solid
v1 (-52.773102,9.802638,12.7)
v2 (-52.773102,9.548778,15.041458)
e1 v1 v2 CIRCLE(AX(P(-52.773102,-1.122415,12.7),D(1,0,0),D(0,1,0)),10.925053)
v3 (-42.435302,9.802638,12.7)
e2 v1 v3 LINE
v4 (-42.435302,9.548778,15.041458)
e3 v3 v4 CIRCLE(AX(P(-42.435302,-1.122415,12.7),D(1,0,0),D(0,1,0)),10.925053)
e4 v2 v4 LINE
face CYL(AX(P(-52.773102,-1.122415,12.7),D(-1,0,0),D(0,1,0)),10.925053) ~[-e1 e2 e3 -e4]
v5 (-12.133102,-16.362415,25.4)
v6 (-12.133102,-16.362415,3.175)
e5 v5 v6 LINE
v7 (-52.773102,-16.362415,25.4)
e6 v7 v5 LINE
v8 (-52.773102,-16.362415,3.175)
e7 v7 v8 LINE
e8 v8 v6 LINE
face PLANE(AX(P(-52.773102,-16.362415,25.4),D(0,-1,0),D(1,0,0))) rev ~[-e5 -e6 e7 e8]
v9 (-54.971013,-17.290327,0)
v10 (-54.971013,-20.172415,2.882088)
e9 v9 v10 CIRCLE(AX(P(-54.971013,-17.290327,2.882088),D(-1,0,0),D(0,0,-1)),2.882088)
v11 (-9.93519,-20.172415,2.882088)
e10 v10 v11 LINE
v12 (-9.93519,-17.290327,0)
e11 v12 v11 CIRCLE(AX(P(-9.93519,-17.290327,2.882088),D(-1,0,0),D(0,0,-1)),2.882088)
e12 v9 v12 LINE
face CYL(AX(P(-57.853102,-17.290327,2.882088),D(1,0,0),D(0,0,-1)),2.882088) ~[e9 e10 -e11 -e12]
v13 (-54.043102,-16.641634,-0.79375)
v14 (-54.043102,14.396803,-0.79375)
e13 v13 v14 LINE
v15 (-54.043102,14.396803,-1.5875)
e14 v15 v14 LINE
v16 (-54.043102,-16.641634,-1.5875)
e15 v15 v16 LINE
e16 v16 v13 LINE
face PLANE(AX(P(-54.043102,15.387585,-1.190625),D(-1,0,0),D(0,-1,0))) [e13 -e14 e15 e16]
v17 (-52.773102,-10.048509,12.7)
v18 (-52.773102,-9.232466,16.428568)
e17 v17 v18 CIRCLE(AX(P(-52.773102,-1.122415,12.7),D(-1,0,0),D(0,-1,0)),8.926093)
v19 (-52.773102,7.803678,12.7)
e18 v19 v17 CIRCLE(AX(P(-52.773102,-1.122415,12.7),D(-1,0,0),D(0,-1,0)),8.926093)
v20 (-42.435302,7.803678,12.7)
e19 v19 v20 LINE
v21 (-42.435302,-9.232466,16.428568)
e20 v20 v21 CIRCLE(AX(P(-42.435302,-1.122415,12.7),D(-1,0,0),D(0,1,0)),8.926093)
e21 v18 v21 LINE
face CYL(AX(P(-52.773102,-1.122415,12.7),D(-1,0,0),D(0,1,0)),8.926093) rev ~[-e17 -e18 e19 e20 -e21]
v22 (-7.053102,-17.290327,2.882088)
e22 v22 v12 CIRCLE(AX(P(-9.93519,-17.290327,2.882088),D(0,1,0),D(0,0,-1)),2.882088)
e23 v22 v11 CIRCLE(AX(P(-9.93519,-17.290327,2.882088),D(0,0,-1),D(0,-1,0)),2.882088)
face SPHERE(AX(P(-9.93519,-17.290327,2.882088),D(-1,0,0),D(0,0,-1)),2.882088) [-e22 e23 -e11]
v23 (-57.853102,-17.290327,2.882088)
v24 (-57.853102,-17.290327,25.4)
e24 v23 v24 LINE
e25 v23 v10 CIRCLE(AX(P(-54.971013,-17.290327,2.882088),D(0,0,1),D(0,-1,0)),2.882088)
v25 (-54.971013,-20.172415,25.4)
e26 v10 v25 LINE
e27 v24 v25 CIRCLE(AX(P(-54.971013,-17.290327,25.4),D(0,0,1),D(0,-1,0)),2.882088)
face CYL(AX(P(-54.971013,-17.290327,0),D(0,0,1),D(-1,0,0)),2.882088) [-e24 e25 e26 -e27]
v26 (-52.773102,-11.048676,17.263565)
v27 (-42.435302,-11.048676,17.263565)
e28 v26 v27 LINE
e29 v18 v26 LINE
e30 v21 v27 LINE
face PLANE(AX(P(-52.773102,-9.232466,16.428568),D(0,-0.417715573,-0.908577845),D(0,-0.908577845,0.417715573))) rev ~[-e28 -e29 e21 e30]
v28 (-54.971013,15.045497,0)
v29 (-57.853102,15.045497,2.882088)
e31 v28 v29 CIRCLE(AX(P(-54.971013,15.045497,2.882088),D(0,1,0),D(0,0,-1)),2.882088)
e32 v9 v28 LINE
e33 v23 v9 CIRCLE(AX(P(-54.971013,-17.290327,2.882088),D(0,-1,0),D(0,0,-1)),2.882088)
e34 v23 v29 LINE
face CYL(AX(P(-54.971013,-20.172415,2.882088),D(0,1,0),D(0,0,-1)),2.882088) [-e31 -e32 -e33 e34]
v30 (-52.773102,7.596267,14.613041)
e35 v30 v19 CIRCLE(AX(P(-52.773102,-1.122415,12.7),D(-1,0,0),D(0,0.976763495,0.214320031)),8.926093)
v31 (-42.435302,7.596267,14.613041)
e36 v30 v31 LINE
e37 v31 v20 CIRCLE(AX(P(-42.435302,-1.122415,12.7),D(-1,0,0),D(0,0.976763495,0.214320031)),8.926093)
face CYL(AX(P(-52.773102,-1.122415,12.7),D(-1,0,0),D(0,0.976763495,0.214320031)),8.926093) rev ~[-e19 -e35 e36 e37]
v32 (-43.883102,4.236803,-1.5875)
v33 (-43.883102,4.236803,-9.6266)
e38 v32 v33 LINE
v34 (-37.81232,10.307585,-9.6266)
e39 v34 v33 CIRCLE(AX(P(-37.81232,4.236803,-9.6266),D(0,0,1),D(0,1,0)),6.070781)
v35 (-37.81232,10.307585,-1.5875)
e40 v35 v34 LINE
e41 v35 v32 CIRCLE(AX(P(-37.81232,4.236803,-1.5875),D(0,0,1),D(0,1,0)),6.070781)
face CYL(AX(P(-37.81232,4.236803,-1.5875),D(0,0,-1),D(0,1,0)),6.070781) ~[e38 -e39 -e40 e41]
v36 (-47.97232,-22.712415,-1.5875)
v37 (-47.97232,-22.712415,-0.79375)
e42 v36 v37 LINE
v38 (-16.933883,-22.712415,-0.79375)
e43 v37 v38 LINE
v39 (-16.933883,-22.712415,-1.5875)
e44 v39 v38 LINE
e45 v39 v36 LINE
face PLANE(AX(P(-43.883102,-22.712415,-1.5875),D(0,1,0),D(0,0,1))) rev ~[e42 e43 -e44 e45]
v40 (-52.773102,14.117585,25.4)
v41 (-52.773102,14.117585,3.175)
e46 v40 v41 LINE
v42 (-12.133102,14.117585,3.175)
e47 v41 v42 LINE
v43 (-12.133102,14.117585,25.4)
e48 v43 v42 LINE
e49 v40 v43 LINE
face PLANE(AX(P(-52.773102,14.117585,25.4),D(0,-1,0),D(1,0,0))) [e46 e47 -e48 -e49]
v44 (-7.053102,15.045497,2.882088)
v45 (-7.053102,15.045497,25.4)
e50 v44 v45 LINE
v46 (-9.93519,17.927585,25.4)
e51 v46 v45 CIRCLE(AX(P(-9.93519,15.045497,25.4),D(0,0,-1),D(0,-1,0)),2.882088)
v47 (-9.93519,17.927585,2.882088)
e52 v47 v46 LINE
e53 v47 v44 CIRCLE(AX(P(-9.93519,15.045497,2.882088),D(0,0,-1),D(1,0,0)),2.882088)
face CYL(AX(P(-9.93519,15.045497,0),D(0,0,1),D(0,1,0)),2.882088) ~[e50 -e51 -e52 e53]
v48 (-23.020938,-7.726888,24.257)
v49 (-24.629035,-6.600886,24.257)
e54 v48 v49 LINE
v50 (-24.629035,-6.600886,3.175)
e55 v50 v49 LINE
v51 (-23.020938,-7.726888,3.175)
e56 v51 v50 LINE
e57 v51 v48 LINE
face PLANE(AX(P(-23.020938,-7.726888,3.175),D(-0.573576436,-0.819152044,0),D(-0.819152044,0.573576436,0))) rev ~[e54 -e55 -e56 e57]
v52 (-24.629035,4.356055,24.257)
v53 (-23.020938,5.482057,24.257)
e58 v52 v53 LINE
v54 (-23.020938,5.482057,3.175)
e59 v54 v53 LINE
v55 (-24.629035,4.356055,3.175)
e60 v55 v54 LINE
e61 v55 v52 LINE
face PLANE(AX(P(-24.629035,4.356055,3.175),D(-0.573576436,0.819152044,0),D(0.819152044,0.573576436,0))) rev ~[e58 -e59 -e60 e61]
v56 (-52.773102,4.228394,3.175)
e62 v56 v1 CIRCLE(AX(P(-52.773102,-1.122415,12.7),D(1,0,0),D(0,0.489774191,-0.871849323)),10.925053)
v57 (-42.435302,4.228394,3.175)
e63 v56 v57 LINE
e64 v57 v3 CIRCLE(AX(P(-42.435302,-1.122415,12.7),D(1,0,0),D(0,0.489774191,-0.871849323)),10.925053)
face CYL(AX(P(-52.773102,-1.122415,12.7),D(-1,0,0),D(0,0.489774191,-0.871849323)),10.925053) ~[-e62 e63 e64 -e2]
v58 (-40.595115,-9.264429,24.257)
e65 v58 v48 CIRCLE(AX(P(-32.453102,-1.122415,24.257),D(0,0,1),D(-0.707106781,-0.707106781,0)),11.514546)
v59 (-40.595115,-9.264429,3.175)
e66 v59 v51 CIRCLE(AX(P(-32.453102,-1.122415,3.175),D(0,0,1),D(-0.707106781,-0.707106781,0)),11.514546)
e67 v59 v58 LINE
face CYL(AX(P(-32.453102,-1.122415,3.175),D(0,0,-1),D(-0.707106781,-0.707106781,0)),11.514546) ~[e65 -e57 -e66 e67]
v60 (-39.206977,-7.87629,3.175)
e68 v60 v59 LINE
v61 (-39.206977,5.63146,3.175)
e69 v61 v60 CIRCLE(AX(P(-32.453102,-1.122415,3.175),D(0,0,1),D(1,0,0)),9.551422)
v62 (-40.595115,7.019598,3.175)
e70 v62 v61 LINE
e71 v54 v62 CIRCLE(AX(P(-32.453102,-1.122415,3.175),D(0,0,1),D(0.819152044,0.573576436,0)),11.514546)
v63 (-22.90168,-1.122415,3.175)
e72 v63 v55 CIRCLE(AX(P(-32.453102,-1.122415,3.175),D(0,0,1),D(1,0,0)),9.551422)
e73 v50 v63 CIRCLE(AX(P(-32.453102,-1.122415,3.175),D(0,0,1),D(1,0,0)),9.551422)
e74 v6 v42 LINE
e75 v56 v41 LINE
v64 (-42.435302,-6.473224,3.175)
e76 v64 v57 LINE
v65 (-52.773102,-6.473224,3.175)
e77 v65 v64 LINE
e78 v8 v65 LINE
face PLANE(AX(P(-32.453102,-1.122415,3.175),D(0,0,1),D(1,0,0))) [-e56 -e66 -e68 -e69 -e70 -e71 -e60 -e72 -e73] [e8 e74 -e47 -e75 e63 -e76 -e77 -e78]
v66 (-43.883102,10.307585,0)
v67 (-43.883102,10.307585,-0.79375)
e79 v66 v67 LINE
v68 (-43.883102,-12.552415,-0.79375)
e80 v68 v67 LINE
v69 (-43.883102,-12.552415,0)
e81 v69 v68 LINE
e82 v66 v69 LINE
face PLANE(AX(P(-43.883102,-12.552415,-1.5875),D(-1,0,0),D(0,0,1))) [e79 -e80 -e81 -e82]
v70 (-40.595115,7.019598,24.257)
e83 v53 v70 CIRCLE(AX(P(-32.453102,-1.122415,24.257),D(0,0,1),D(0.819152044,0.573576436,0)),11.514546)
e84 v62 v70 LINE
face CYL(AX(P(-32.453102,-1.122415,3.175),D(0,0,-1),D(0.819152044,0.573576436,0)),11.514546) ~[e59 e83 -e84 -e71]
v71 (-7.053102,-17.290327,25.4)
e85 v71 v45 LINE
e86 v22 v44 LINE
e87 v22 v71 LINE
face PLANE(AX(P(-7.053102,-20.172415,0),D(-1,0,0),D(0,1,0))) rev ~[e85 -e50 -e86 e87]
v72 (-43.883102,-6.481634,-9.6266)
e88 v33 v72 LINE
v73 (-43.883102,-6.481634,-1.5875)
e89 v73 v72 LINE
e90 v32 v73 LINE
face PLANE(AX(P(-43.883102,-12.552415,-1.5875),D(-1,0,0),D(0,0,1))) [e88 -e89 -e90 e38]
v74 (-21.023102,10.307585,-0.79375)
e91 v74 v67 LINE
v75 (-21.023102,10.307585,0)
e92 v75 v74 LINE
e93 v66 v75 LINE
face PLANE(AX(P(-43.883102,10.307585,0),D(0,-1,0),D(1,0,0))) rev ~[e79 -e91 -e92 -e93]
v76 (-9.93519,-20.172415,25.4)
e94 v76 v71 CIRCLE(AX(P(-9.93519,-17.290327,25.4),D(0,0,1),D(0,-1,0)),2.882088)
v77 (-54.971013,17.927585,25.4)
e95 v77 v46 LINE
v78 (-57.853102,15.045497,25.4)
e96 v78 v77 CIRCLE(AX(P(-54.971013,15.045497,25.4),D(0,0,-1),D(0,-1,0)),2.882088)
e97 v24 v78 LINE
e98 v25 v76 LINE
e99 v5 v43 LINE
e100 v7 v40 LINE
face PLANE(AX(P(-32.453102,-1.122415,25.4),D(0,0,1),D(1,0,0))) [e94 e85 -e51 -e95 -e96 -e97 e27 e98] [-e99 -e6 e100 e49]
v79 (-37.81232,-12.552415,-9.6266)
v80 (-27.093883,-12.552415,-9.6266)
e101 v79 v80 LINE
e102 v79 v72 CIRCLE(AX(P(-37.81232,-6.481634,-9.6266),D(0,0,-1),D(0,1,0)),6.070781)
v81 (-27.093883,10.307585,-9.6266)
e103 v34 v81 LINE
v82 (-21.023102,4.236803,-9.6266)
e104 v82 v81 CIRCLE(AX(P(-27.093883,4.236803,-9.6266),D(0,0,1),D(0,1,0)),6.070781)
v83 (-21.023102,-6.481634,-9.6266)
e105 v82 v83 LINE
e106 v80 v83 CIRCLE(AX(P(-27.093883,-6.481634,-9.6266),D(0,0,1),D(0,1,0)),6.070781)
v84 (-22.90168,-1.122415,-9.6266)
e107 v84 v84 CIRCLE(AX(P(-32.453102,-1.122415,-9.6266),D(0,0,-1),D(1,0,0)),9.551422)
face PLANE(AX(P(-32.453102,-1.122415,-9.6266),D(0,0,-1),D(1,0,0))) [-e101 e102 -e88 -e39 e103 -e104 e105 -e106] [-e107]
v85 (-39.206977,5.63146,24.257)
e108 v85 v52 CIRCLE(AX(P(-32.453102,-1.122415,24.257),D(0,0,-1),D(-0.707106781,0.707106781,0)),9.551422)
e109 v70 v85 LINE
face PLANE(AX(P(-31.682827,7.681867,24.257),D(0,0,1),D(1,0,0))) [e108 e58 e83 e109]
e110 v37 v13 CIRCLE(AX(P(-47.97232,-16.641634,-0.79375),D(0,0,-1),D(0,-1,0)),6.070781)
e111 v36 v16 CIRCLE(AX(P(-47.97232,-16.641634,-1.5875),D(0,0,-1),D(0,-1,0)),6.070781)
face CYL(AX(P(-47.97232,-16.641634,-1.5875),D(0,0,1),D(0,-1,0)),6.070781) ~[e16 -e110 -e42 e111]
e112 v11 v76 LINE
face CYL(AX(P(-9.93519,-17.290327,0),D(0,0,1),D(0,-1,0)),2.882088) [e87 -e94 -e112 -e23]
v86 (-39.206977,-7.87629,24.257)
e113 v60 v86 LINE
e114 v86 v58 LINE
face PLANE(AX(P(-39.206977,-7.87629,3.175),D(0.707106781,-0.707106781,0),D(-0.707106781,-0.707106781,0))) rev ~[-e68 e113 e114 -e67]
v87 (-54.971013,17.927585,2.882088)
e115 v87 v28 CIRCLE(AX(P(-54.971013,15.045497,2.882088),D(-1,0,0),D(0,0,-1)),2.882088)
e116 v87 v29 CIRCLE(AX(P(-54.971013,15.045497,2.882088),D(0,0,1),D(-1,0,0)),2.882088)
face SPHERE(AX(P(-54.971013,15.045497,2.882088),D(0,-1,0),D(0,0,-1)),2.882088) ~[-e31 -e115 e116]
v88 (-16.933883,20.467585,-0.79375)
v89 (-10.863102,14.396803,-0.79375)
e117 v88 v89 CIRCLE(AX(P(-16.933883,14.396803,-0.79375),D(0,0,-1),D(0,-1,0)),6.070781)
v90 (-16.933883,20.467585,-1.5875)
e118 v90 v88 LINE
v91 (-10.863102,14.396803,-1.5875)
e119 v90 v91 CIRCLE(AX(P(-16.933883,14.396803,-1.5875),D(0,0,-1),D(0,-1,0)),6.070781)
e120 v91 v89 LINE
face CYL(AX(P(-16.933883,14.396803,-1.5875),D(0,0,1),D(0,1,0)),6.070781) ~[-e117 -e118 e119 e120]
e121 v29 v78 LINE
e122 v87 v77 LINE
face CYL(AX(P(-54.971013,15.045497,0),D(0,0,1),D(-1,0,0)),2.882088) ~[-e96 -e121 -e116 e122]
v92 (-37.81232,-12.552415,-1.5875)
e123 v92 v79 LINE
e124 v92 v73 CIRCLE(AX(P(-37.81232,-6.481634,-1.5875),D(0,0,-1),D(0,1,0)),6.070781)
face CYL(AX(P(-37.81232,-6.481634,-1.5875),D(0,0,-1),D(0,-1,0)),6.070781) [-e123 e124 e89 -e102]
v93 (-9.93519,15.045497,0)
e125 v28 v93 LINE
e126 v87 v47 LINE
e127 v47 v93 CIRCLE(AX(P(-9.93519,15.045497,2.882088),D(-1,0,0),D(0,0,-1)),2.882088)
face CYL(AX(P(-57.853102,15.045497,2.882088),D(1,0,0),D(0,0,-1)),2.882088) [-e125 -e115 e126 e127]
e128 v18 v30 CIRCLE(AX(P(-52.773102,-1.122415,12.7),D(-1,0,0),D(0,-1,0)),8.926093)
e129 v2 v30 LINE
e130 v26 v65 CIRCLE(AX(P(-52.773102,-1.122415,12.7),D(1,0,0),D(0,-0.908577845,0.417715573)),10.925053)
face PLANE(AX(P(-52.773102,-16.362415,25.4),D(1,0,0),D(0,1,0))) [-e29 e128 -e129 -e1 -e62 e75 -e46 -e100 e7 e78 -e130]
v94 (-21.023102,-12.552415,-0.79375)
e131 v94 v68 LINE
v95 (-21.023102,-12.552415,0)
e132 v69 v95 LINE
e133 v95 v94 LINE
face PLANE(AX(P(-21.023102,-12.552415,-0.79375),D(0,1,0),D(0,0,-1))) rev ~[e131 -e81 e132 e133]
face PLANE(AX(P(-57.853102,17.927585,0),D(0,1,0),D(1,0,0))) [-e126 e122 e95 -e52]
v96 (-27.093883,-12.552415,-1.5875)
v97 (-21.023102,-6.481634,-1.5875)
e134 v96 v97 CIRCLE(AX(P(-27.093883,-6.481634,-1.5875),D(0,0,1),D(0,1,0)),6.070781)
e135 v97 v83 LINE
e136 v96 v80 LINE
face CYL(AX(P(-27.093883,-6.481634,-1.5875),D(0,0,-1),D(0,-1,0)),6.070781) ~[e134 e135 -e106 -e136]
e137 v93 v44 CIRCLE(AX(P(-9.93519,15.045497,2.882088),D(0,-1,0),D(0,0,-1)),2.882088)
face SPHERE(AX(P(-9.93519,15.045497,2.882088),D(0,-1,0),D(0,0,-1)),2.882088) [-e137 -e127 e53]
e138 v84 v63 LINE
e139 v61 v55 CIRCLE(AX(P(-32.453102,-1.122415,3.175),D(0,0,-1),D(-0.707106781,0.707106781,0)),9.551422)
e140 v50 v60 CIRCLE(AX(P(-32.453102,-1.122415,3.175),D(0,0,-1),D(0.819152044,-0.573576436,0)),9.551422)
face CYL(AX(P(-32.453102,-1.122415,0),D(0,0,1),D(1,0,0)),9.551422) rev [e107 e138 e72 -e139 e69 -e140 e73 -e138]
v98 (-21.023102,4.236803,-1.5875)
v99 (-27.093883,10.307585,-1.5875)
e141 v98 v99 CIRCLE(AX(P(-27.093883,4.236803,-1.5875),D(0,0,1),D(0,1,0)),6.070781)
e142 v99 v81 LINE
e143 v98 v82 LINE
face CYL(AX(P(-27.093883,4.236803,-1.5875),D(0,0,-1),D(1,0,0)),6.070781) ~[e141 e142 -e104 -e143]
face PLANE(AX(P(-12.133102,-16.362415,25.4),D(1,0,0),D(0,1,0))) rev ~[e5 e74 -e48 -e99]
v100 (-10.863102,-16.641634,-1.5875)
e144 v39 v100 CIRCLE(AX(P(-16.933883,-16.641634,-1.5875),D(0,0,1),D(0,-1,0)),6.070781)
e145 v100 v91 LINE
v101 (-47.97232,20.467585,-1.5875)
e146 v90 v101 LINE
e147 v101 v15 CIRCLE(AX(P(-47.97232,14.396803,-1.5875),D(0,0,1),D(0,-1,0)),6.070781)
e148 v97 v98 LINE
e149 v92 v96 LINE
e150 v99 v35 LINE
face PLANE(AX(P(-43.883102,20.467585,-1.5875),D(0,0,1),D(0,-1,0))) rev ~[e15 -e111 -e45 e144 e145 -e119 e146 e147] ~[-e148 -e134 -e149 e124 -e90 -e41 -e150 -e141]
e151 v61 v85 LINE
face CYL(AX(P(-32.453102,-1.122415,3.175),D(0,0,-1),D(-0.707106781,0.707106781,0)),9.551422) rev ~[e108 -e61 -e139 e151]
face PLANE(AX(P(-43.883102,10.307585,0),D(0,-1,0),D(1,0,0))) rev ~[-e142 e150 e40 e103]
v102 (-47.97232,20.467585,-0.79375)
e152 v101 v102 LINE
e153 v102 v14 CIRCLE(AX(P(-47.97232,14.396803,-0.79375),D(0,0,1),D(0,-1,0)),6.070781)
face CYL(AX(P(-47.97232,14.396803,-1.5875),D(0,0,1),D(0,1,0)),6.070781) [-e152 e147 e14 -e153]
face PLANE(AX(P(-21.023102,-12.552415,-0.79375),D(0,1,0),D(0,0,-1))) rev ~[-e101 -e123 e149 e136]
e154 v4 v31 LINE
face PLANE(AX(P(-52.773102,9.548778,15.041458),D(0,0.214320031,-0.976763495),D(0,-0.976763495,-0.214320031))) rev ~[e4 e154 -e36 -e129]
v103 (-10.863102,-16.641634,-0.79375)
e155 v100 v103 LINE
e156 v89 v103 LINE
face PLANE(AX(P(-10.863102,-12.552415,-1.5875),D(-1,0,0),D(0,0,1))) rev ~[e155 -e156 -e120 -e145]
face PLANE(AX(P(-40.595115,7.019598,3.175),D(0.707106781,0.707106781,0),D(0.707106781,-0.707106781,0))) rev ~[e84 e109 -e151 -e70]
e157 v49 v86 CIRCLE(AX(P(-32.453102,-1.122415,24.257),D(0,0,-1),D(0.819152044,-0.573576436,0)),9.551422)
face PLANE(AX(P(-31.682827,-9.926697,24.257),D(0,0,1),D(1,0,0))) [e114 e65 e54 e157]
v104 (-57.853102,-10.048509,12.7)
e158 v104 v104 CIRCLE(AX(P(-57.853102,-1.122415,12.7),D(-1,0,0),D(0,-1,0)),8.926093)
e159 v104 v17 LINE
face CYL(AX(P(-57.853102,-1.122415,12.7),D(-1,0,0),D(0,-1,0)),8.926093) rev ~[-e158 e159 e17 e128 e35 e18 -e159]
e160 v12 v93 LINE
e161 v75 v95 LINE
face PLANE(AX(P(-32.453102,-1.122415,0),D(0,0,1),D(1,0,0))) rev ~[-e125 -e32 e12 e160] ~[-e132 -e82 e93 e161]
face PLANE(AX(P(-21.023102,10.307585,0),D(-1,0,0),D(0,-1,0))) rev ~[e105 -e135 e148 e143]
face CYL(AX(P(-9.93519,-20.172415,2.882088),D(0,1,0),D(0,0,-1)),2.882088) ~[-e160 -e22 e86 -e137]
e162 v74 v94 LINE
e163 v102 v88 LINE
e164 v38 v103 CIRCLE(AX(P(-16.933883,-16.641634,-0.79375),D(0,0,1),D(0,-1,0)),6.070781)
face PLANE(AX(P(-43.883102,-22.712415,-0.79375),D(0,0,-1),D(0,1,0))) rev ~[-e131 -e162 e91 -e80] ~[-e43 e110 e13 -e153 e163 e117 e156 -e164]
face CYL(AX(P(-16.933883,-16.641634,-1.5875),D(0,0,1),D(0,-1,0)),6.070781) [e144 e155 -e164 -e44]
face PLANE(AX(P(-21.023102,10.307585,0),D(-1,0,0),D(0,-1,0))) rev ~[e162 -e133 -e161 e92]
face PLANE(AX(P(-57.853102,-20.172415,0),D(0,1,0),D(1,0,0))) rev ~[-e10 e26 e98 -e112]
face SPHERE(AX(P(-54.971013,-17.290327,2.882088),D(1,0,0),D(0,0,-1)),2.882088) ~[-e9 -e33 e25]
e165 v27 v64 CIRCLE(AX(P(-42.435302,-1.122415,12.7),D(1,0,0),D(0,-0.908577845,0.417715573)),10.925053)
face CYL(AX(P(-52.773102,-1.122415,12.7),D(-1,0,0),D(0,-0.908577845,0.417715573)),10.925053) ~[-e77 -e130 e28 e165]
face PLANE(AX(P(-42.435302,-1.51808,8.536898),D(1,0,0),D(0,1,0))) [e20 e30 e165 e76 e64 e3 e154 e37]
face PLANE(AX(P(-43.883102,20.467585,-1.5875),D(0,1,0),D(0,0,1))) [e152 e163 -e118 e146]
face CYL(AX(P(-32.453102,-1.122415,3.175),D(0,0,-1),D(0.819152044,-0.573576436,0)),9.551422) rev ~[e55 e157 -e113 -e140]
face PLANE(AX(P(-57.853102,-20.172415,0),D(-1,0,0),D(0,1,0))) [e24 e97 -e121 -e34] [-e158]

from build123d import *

# Parameters (mm, degrees)
F0_W      = 50.8
F0_H      = 38.1
F1_DEPTH  = 25.4
F2_W      = 40.64
F2_H      = 30.48
F3_DEPTH  = 22.225
F4_R      = 9.5514218063
F5_DEPTH  = 25.4
F6_R      = 8.9260934587
F7_DEPTH  = 25.4
F9_DEPTH  = 10.3378
F11_DEPTH = 21.082
F12_W     = 22.86
F12_H     = 22.86
F12_R     = 10.7189198073
F12_R_2   = 9.5514218063
F13_DEPTH = 9.6266
F14_W     = 22.86
F14_H     = 0.79375
F15_DEPTH = 10.16
F17_DEPTH = 10.16
F18_W     = 10.16
F18_H     = 0.79375
F18_W_2   = 22.86
F19_DEPTH = 10.16
F20_W     = 10.16
F20_H     = 0.79375
F20_W_2   = 22.86
F21_DEPTH = 10.16
F22_R     = 6.0707814239
F23_R     = 2.8820881508


# Not quite as in the source:
# - a length typed as a fraction of an inch, garbled in the dataset ("3 / 203.2 mm" for 3/8 in), is restored
# - a feature names something its author has since deleted; it is built from what else it names


with BuildPart() as f1:
    # F0 (on Top) → F1 (new body)
    with BuildSketch(Plane.XY):
        with Locations((-32.453101594, -1.12241521)):
            Rectangle(F0_W, F0_H)
    extrude(amount=F1_DEPTH)

    # F2 (on face) → F3 (cut)
    with BuildSketch(Plane.XY.offset(25.4)):
        with Locations((-32.453101594, -1.12241521)):
            Rectangle(F2_W, F2_H)
    extrude(amount=-F3_DEPTH, mode=Mode.SUBTRACT)

    # F4 (on face) → F5 (cut)
    with BuildSketch(Plane.XY.offset(3.175)):
        with Locations((-32.453101594, -1.12241521)):
            Circle(F4_R)
    extrude(amount=-F5_DEPTH, mode=Mode.SUBTRACT)

    # F6 (on face) → F7 (cut)
    with BuildSketch(Plane(origin=(-57.853101594, 0, 0), x_dir=(0, -1, 0), z_dir=(-1, 0, 0))):
        with Locations((1.12241521, 12.7)):
            Circle(F6_R)
    extrude(amount=-F7_DEPTH, mode=Mode.SUBTRACT)

    # F8 (on face) → F9 (join)
    with BuildSketch(Plane.YZ.offset(-52.773101594)):
        with BuildLine():
            ThreePointArc((4.2283937472, 3.175), (8.3066529455, 7.1818974988), (9.8026377187, 12.7))
            ThreePointArc((9.8026377187, 12.7), (9.7389872891, 13.8775895924), (9.5487776675, 15.0414576799))
            Line((9.5487776675, 15.0414576799), (7.5962670299, 14.6130406248))
            ThreePointArc((7.5962670299, 14.6130406248), (7.7516739529, 13.6621257514), (7.8036782487, 12.7))
            ThreePointArc((7.8036782487, 12.7), (-3.0308273005, 3.9803034613), (-9.2324659679, 16.4285682425))
            Line((-9.2324659679, 16.4285682425), (-11.0486762552, 17.2635647427))
            ThreePointArc((-11.0486762552, 17.2635647427), (-11.5132347682, 9.3254407095), (-6.4732241672, 3.175))
            Line((-6.4732241672, 3.175), (4.2283937472, 3.175))
        make_face()
    extrude(amount=F9_DEPTH)

    # F10 (on face) → F11 (join)
    with BuildSketch(Plane.XY.offset(3.175)):
        with BuildLine():
            Line((-24.6290348955, 4.3560552717), (-23.0209375751, 5.4820571376))
            ThreePointArc((-23.0209375751, 5.4820571376), (-31.4495427718, 10.3483146168), (-40.5951152599, 7.0195984558))
            Line((-40.5951152599, 7.0195984558), (-39.2069767232, 5.6314599192))
            ThreePointArc((-39.2069767232, 5.6314599192), (-31.6206403322, 8.3926605526), (-24.6290348955, 4.3560552717))
        make_face()
        with BuildLine():
            ThreePointArc((-40.5951152599, -9.2644288759), (-31.4495427718, -12.5931450369), (-23.0209375751, -7.7268875577))
            Line((-23.0209375751, -7.7268875577), (-24.6290348955, -6.6008856918))
            ThreePointArc((-24.6290348955, -6.6008856918), (-31.6206403322, -10.6374909727), (-39.2069767232, -7.8762903393))
            Line((-39.2069767232, -7.8762903393), (-40.5951152599, -9.2644288759))
        make_face()
    extrude(amount=F11_DEPTH)

    # F12 (on face) → F13 (join)
    with BuildSketch(Plane(origin=(0, 0, 0), x_dir=(1, 0, 0), z_dir=(0, 0, -1))):
        with Locations((-32.453101594, 1.12241521)):
            Rectangle(F12_W, F12_H)
        with Locations((-32.453101594, 1.12241521)):
            Circle(F12_R, mode=Mode.SUBTRACT)
        with Locations((-32.453101594, 1.12241521)):
            Circle(F12_R)
        with Locations((-32.453101594, 1.12241521)):
            Circle(F12_R_2, mode=Mode.SUBTRACT)
    extrude(amount=F13_DEPTH)

    # F14 (on face) → F15 (join)
    with BuildSketch(Plane(origin=(0, 10.30758479, 0), x_dir=(-1, 0, 0), z_dir=(0, 1, 0))):
        with Locations((32.453101594, -1.190625)):
            Rectangle(F14_W, F14_H)
    extrude(amount=F15_DEPTH)

    # F16 (on face) → F17 (join)
    with BuildSketch(Plane.YZ.offset(-21.023101594)):
        Polygon((-12.55241521, -0.79375), (-12.55241521, -1.5875), (10.30758479, -1.5875), (20.46758479, -1.5875), (20.46758479, -0.79375), (10.30758479, -0.79375), align=None)
    extrude(amount=F17_DEPTH)

    # F18 (on face) → F19 (join)
    with BuildSketch(Plane.XZ.offset(12.55241521)):
        with Locations((-15.943101594, -1.190625)):
            Rectangle(F18_W, F18_H)
        with Locations((-32.453101594, -1.190625)):
            Rectangle(F18_W_2, F18_H)
    extrude(amount=F19_DEPTH)

    # F20 (on face) → F21 (join)
    with BuildSketch(Plane(origin=(-43.883101594, 0, 0), x_dir=(0, -1, 0), z_dir=(-1, 0, 0))):
        with Locations((-15.38758479, -1.190625)):
            Rectangle(F20_W, F20_H)
        with Locations((1.12241521, -1.190625)):
            Rectangle(F20_W_2, F20_H)
        with Locations((17.63241521, -1.190625)):
            Rectangle(F20_W, F20_H)
    extrude(amount=F21_DEPTH)

    # F22
    f22_edges = [f1.edges().sort_by_distance(p)[0] for p in [
        (-10.863102, 20.467585, -1.190625),
        (-54.043102, 20.467585, -1.190625),
        (-54.043102, -22.712415, -1.190625),
        (-10.863102, -22.712415, -1.190625),
        (-21.023102, -12.552415, -5.60705),
        (-43.883102, -12.552415, -5.60705),
        (-43.883102, 10.307585, -5.60705),
        (-21.023102, 10.307585, -5.60705),
    ]]
    fillet(f22_edges, radius=F22_R)

    # F23
    f23_edges = [f1.edges().sort_by_distance(p)[0] for p in [
        (-32.453102, -20.172415, 0),
        (-57.853102, -1.122415, 0),
        (-57.853102, -20.172415, 12.7),
        (-7.053102, -1.122415, 0),
        (-7.053102, -20.172415, 12.7),
        (-32.453102, 17.927585, 0),
        (-7.053102, 17.927585, 12.7),
        (-57.853102, 17.927585, 12.7),
    ]]
    fillet(f23_edges, radius=F23_R)


solid = f1.part
